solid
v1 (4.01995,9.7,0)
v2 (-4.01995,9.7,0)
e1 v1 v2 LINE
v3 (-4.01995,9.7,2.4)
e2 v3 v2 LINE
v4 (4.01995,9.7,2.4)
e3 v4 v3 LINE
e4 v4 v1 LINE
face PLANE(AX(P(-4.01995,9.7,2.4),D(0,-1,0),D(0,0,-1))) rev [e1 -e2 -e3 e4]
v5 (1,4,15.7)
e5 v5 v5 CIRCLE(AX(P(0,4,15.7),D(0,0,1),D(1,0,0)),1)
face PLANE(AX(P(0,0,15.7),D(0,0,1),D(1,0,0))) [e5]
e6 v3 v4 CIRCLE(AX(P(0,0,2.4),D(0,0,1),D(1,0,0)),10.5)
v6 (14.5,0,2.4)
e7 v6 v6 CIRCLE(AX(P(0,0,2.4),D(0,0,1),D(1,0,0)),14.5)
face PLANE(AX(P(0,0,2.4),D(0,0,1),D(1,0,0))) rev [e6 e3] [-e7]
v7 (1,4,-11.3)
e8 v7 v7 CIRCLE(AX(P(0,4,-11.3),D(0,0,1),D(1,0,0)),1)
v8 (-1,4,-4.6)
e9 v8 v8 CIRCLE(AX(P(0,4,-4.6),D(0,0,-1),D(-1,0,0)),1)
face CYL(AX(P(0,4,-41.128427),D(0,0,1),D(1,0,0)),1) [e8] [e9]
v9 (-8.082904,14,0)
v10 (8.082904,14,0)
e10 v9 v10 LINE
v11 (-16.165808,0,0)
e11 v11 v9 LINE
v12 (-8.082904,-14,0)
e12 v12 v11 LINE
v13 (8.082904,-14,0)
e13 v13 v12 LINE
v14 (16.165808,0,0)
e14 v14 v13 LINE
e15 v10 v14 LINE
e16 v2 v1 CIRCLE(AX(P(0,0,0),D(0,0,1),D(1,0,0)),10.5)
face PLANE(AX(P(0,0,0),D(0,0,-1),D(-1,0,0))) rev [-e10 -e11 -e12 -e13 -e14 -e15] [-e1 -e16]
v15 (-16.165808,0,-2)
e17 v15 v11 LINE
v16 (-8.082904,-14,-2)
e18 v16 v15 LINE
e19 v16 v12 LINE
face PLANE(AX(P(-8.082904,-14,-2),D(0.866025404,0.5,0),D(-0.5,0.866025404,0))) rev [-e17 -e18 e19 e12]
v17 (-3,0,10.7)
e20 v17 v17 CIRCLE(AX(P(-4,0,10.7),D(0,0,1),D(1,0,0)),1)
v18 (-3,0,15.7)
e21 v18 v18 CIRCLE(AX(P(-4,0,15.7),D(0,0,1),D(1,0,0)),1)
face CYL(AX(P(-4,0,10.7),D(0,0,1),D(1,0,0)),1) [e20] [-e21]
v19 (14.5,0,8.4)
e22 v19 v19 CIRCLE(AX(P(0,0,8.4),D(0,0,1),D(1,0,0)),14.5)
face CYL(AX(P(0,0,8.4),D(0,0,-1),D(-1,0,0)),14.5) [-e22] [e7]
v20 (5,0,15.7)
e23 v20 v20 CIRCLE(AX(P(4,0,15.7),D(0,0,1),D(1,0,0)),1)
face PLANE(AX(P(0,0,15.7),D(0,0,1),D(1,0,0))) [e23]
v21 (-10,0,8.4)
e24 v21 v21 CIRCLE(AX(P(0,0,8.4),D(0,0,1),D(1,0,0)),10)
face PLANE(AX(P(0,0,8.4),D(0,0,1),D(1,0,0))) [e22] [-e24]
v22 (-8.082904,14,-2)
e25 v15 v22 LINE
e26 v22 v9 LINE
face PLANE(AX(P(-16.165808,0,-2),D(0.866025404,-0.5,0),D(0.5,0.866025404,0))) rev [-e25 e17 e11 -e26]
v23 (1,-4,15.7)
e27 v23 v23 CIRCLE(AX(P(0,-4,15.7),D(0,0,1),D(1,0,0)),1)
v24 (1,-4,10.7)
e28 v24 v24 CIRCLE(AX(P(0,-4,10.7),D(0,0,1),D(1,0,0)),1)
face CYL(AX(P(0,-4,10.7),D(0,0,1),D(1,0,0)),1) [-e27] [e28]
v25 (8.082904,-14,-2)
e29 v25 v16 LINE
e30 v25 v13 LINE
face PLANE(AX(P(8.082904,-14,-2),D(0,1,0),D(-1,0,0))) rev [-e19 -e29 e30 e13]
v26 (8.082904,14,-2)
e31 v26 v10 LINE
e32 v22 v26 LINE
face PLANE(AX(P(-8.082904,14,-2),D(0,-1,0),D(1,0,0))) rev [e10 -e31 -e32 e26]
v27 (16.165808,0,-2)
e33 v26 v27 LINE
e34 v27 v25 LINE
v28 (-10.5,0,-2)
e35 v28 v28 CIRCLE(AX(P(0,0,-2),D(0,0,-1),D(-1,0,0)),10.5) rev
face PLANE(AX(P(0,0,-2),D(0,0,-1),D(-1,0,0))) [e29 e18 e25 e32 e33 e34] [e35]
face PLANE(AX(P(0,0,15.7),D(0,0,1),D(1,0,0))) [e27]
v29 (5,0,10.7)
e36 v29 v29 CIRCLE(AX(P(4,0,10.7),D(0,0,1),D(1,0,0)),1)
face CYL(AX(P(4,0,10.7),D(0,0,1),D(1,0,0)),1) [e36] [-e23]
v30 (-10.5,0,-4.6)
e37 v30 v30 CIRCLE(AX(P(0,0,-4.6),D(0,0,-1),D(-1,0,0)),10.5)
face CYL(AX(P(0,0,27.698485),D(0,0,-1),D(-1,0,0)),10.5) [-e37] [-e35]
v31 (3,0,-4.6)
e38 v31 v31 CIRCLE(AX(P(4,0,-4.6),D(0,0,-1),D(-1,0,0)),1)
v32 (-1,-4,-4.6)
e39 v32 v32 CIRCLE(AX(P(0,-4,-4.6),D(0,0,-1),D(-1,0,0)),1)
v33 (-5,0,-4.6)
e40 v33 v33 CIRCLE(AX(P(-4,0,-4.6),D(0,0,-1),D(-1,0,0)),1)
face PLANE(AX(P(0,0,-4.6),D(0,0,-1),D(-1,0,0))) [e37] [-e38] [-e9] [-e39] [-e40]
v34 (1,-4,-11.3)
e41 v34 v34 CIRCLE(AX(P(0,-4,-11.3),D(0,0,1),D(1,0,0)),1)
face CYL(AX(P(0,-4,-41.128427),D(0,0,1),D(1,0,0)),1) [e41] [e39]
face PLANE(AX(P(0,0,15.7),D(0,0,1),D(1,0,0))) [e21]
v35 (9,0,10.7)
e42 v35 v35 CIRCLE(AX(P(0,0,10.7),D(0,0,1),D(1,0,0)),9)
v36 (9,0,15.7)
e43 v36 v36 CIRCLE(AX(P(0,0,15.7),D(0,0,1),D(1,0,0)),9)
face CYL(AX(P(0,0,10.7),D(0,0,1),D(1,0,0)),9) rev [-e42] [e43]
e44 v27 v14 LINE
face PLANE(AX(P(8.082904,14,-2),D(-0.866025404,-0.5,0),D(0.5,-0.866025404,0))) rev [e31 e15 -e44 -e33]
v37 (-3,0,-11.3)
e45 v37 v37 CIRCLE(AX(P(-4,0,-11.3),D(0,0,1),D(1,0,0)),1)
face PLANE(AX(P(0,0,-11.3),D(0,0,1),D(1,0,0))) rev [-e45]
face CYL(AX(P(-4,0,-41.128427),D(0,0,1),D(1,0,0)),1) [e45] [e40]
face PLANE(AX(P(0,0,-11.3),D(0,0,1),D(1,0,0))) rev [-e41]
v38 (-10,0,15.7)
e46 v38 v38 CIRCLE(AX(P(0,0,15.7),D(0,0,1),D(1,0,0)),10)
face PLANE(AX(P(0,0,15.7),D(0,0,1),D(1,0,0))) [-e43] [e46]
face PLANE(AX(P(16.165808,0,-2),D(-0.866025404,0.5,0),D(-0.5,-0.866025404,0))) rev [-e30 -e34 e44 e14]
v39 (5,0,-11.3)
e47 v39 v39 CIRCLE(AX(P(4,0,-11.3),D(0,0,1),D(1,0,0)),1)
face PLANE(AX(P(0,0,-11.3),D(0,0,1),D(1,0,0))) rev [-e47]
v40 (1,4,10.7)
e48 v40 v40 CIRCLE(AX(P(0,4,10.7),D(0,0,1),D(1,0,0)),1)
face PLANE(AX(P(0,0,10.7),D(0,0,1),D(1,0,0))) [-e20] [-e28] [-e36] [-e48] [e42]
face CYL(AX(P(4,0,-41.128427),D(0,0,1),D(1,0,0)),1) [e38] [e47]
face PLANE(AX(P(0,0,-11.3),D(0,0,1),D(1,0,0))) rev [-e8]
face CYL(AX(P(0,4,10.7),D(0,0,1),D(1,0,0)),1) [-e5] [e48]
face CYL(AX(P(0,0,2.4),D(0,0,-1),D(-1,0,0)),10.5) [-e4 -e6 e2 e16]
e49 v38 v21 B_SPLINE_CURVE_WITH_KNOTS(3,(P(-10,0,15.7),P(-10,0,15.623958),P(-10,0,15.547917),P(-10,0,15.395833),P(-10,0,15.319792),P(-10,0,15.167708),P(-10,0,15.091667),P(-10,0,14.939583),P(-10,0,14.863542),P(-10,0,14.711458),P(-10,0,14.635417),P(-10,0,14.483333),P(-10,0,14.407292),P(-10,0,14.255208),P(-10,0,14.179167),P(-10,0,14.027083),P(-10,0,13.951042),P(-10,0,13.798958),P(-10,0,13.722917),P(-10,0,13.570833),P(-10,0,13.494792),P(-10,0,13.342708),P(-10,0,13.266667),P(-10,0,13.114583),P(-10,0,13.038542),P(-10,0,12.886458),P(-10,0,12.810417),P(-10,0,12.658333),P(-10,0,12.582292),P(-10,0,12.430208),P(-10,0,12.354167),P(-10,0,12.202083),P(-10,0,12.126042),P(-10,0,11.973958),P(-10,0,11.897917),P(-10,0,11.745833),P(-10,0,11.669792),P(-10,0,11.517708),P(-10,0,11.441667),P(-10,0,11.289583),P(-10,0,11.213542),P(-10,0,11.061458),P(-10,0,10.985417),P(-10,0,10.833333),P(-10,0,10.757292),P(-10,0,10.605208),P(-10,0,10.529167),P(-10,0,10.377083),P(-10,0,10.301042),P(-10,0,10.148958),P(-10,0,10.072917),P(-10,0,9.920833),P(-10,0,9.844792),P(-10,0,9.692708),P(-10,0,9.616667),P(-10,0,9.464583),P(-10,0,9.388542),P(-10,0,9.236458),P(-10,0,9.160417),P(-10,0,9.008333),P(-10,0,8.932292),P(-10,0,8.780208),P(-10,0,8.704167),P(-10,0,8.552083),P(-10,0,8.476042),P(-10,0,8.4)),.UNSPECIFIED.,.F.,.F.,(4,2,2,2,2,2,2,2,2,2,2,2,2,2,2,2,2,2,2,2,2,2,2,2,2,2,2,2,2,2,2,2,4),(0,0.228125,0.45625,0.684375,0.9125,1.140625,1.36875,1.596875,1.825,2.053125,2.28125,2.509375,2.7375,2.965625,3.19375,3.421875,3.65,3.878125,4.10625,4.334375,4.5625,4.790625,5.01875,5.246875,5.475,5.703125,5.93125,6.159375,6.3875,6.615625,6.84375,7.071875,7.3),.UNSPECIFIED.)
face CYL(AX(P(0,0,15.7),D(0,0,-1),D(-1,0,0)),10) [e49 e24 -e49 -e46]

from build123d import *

# Parameters (mm, degrees)
DODANIE_WYCI_GNI_CIE1_DEPTH       = 2.4
SZKIC2_R                          = 14.5
DODANIE_WYCI_GNI_CIE2_DEPTH       = 6
SZKIC3_R                          = 10
DODANIE_WYCI_GNI_CIE3_DEPTH       = 7.3
DODANIE_WYCI_GNI_CIE4_START       = -5
DODANIE_WYCI_GNI_CIE4_OUTLINE_R   = 9
DODANIE_WYCI_GNI_CIE4_OUTLINE_R_2 = 1
DODANIE_WYCI_GNI_CIE4_DEPTH       = 5
DODANIE_WYCI_GNI_CIE5_DEPTH       = 2
DODANIE_WYCI_GNI_CIE6_START       = 7
SZKIC6_R                          = 10.5
DODANIE_WYCI_GNI_CIE6_DEPTH       = 2.6
DODANIE_WYCI_GNI_CIE7_START       = 6.7
SZKIC7_R                          = 1
DODANIE_WYCI_GNI_CIE7_DEPTH       = 6.7


# Read off the part's stored shape, not the designer's step: Dodanie-wyciągnięcie4
with BuildPart() as part:
    # Szkic1 → Dodanie-wyciągnięcie1 (new body)
    with BuildSketch(Plane.XY):
        with BuildLine():
            Line((-4.019950248, 9.7), (4.019950248, 9.7))
            ThreePointArc((4.019950248, 9.7), (0, -10.5), (-4.019950248, 9.7))
        make_face()
    extrude(amount=DODANIE_WYCI_GNI_CIE1_DEPTH)

    # Szkic2 → Dodanie-wyciągnięcie2 (add)
    with BuildSketch(Plane.XY.offset(2.4)):
        Circle(SZKIC2_R)
    extrude(amount=DODANIE_WYCI_GNI_CIE2_DEPTH)

    # Szkic3 → Dodanie-wyciągnięcie3 (add)
    with BuildSketch(Plane.XY.offset(8.4)):
        with Locations(Location((0, 0, 0), (0, 0, 180))):
            Circle(SZKIC3_R)
    extrude(amount=DODANIE_WYCI_GNI_CIE3_DEPTH)

    # Dodanie-wyciągnięcie4 outline → Dodanie-wyciągnięcie4 (cut)
    with BuildSketch(Plane.XY.offset(15.7).offset(DODANIE_WYCI_GNI_CIE4_START)):
        Circle(DODANIE_WYCI_GNI_CIE4_OUTLINE_R)
        with Locations((0, -4)):
            Circle(DODANIE_WYCI_GNI_CIE4_OUTLINE_R_2, mode=Mode.SUBTRACT)
        with Locations((-4, 0)):
            Circle(DODANIE_WYCI_GNI_CIE4_OUTLINE_R_2, mode=Mode.SUBTRACT)
        with Locations((4, 0)):
            Circle(DODANIE_WYCI_GNI_CIE4_OUTLINE_R_2, mode=Mode.SUBTRACT)
        with Locations((0, 4)):
            Circle(DODANIE_WYCI_GNI_CIE4_OUTLINE_R_2, mode=Mode.SUBTRACT)
    extrude(amount=DODANIE_WYCI_GNI_CIE4_DEPTH, mode=Mode.SUBTRACT)

    # Szkic5 → Dodanie-wyciągnięcie5 (add)
    with BuildSketch(Plane(origin=(0, 0, 0), x_dir=(-1, 0, 0), z_dir=(0, 0, -1))):
        Polygon((8.082903769, 14), (-8.082903769, 14), (-16.165807537, 0), (-8.082903769, -14), (8.082903769, -14), (16.165807537, 0), align=None)
    extrude(amount=DODANIE_WYCI_GNI_CIE5_DEPTH)

    # Szkic6 → Dodanie-wyciągnięcie6 (add)
    with BuildSketch(Plane(origin=(0, 0, 2.4), x_dir=(-1, 0, 0), z_dir=(0, 0, -1)).offset(DODANIE_WYCI_GNI_CIE6_START)):
        Circle(SZKIC6_R)
    extrude(amount=-DODANIE_WYCI_GNI_CIE6_DEPTH)

    # Szkic7 → Dodanie-wyciągnięcie7 (add)
    with BuildSketch(Plane(origin=(0, 0, -4.6), x_dir=(-1, 0, 0), z_dir=(0, 0, -1)).offset(DODANIE_WYCI_GNI_CIE7_START)):
        with Locations(Location((0, -4, 0), (0, 0, 180))):
            Circle(SZKIC7_R)
        with Locations(Location((4, 0, 0), (0, 0, 180))):
            Circle(SZKIC7_R)
        with Locations(Location((0, 4, 0), (0, 0, 180))):
            Circle(SZKIC7_R)
        with Locations(Location((-4, 0, 0), (0, 0, 180))):
            Circle(SZKIC7_R)
    extrude(amount=-DODANIE_WYCI_GNI_CIE7_DEPTH)


solid = part.part
